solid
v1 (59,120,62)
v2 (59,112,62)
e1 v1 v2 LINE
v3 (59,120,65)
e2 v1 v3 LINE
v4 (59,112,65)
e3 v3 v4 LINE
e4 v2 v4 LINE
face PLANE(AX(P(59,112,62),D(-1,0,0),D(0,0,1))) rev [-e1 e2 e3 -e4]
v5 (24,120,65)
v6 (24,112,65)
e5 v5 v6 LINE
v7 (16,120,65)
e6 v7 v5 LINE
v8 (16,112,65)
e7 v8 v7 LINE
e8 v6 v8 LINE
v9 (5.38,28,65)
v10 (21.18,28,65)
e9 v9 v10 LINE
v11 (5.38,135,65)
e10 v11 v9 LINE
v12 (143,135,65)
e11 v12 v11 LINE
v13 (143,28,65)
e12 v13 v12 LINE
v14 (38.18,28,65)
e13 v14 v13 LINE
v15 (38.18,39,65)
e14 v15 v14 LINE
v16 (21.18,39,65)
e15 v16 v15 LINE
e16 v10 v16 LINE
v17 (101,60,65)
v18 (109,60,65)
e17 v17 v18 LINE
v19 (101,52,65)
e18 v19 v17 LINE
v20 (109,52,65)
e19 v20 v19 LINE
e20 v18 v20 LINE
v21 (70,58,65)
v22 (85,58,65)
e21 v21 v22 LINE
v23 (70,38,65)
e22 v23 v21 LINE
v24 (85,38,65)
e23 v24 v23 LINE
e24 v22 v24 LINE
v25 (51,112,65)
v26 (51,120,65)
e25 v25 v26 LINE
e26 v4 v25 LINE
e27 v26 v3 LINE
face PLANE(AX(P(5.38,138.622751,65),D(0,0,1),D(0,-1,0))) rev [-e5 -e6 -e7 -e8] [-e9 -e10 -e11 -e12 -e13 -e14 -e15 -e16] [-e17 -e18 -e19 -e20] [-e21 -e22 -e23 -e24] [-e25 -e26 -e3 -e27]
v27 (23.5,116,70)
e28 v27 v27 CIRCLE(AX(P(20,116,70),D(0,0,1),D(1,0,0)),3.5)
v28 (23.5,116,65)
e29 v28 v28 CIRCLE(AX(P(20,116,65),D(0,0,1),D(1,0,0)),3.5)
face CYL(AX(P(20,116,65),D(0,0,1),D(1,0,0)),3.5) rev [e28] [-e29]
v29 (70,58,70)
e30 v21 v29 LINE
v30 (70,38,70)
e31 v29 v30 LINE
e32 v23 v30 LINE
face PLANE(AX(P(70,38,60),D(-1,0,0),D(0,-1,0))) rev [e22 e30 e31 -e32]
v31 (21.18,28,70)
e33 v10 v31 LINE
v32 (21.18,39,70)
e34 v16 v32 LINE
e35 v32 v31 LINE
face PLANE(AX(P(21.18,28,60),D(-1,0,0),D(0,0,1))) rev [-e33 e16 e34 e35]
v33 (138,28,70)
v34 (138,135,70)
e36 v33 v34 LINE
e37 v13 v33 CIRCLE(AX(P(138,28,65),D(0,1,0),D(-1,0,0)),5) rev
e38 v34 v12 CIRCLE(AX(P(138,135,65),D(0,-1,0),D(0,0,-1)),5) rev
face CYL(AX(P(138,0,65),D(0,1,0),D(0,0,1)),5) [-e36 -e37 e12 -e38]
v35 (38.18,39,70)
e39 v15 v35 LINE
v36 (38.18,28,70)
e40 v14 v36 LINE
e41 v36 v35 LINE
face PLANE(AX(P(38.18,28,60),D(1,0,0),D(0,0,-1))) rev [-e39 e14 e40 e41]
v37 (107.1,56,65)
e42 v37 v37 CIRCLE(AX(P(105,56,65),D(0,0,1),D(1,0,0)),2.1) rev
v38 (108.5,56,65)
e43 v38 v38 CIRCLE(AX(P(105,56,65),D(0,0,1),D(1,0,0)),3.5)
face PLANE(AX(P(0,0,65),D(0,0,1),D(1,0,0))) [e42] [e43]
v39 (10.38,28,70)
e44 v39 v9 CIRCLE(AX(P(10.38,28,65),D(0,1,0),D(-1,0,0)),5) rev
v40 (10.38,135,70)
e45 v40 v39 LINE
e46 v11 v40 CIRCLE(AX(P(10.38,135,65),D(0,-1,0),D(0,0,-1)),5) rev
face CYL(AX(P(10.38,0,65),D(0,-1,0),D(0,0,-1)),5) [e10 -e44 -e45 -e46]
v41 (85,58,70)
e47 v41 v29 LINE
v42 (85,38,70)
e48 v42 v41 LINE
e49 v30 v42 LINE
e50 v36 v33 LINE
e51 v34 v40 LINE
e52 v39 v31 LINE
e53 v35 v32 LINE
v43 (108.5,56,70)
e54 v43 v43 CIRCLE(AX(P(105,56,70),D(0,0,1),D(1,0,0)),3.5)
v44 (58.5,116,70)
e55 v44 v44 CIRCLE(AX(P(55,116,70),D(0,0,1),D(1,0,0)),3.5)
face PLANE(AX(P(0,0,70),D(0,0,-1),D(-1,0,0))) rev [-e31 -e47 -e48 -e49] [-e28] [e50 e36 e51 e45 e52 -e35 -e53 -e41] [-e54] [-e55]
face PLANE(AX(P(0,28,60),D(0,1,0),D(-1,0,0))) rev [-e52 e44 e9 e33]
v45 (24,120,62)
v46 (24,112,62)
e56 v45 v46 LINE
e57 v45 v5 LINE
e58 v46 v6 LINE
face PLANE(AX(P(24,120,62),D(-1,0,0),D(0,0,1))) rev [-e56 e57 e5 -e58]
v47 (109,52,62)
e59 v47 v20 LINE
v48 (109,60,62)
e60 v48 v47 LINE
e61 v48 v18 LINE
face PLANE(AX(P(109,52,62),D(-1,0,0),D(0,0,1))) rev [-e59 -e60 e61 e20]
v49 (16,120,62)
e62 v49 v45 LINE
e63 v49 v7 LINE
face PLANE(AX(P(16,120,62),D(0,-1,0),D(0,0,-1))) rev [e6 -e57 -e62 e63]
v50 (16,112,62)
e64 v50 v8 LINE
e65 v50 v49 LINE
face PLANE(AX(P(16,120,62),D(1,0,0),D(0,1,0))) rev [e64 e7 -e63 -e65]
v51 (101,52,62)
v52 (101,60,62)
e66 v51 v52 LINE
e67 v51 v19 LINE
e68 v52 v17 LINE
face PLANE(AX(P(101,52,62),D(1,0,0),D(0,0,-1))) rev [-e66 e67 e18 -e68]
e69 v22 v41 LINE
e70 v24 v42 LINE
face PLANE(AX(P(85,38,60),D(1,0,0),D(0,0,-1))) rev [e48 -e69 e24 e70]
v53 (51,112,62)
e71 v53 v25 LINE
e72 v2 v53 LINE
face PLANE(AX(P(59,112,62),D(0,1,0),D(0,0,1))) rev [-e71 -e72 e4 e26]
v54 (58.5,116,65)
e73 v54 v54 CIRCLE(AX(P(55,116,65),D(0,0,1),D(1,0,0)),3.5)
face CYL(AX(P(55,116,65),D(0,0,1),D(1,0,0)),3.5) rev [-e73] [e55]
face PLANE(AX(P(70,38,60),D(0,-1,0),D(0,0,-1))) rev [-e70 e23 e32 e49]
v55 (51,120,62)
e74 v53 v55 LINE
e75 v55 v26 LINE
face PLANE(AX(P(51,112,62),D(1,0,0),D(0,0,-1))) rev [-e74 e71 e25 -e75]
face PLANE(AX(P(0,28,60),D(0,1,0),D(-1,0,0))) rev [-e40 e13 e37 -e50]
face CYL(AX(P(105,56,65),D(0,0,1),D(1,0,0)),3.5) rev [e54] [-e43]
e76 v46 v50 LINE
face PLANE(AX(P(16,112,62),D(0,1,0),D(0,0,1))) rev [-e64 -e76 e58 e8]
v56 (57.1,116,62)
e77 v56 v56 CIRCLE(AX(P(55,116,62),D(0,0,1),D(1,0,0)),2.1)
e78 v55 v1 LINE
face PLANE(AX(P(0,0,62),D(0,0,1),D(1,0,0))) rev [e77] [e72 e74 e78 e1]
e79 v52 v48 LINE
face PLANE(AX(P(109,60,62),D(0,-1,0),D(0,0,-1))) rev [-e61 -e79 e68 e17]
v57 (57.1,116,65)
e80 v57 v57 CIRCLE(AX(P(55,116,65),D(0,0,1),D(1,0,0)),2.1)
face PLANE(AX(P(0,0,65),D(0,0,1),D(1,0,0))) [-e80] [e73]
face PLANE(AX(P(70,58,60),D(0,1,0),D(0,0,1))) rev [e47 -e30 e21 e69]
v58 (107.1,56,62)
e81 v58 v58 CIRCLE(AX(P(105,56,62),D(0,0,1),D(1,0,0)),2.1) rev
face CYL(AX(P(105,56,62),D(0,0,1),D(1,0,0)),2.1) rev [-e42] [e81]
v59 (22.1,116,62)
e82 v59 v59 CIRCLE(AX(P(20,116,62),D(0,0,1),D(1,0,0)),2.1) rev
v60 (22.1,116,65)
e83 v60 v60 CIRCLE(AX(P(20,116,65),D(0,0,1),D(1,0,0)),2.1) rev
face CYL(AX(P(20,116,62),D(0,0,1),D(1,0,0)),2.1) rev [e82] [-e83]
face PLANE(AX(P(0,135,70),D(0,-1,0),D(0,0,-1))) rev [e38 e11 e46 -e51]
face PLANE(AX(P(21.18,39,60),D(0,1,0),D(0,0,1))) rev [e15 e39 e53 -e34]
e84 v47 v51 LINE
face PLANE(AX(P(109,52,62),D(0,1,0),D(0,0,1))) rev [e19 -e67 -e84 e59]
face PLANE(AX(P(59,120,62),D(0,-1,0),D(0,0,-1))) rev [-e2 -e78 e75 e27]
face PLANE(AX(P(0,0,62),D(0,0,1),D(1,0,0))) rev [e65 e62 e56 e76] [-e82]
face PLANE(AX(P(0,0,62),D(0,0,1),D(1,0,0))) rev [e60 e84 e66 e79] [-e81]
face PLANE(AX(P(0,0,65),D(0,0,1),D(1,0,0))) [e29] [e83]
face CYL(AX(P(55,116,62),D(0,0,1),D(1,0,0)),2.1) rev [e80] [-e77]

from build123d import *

# Parameters (mm, degrees)
SKETCH1_W                = 150
SKETCH1_H                = 135
SKETCH1_R                = 2.1
BOSS_EXTRUDE2_DEPTH      = 70
SKETCH13_W               = 166.167800453
SKETCH13_H               = 148.934240363
CUT_EXTRUDE1_DEPTH       = 60
SKETCH17_W               = 17
SKETCH17_H               = 11
SKETCH17_W_2             = 15
SKETCH17_H_2             = 20
CUT_EXTRUDE5_DEPTH       = 10
CUT_EXTRUDE6_DEPTH       = 203.051973512
CUT_EXTRUDE6_DEPTH_BACK  = 203.051973512
SKETCH18_W               = 150
SKETCH18_H               = 135
CUT_EXTRUDE7_DEPTH       = 206.095744471
CUT_EXTRUDE7_DEPTH_BACK  = 206.095744471
FILLET1_R                = 5
SKETCH20_W               = 8
SKETCH20_H               = 8
BOSS_EXTRUDE3_DEPTH      = 3
CUT_EXTRUDE9_START       = -5
SKETCH21_R               = 3.5
SKETCH21_R_2             = 2.1
CUT_EXTRUDE9_DEPTH       = 5
CUT_EXTRUDE10_DEPTH      = 197.81971446
CUT_EXTRUDE10_DEPTH_BACK = 197.81971446
SKETCH21_2_R             = 2.1


with BuildPart() as part:
    # Sketch1 → Boss-Extrude2 (new body)
    with BuildSketch(Plane.XY):
        with Locations((75, 67.5)):
            Rectangle(SKETCH1_W, SKETCH1_H)
        with Locations((20, 116)):
            Circle(SKETCH1_R, mode=Mode.SUBTRACT)
        with Locations((55, 116)):
            Circle(SKETCH1_R, mode=Mode.SUBTRACT)
        with Locations((105, 56)):
            Circle(SKETCH1_R, mode=Mode.SUBTRACT)
    extrude(amount=BOSS_EXTRUDE2_DEPTH)

    # Sketch13 → Cut-Extrude1 (cut)
    with BuildSketch(Plane(origin=(0, 0, 0), x_dir=(-1, 0, 0), z_dir=(0, 0, -1))):
        with Locations((-76.451247165, 67.95351474)):
            Rectangle(SKETCH13_W, SKETCH13_H)
    extrude(amount=-CUT_EXTRUDE1_DEPTH, mode=Mode.SUBTRACT)

    # Sketch17 → Cut-Extrude5 (cut)
    with BuildSketch(Plane.XY.offset(70)):
        with Locations((29.68, 33.5)):
            Rectangle(SKETCH17_W, SKETCH17_H)
        with Locations((77.5, 48)):
            Rectangle(SKETCH17_W_2, SKETCH17_H_2)
    extrude(amount=-CUT_EXTRUDE5_DEPTH, mode=Mode.SUBTRACT)

    # Sketch18 → Cut-Extrude6 (cut, two sides: drawn at the far end of the back side and taken through both)
    # profile 1 of 2: a face of its own
    with BuildSketch(Plane.XY.offset(70).offset(-CUT_EXTRUDE6_DEPTH_BACK)):
        Polygon((-16.428571429, -29.414285714), (-20.085714286, 157.1), (193.857142857, 157.1), (193.857142857, -29.414285714), align=None)
        with Locations((75, 67.5)):
            Rectangle(SKETCH18_W, SKETCH18_H, mode=Mode.SUBTRACT)
    # profile 2 of 2: a face of its own
    with BuildSketch(Plane.XY.offset(70).offset(-CUT_EXTRUDE6_DEPTH_BACK)):
        Polygon((143, 28), (5.38, 28), (5.38, 135), (0, 135), (0, 0), (150, 0), (150, 135), (143, 135), align=None)
    extrude(amount=CUT_EXTRUDE6_DEPTH + CUT_EXTRUDE6_DEPTH_BACK, mode=Mode.SUBTRACT)

    # Sketch19 → Cut-Extrude7 (cut, two sides: drawn at the far end of the back side and taken through both)
    with BuildSketch(Plane(origin=(143, 0, 0), x_dir=(0, 0, -1), z_dir=(1, 0, 0)).offset(-CUT_EXTRUDE7_DEPTH_BACK)):
        Polygon((-65, 138.622751323), (-65, 12.247752415), (-38.78181863, -5.10096745), (-31.852947011, 142.632473856), align=None)
    extrude(amount=CUT_EXTRUDE7_DEPTH + CUT_EXTRUDE7_DEPTH_BACK, mode=Mode.SUBTRACT)

    # Fillet1
    fillet1_edges = [part.edges().sort_by_distance(p)[0] for p in [
        (5.38, 81.5, 70),
        (143, 81.5, 70),
    ]]
    fillet(fillet1_edges, radius=FILLET1_R - 0.0001)  # a hair under: the kernel refuses the full size

    # Sketch20 → Boss-Extrude3 (add)
    with BuildSketch(Plane(origin=(0, 0, 65), x_dir=(-1, 0, 0), z_dir=(0, 0, -1))):
        with Locations((-55, 116)):
            Rectangle(SKETCH20_W, SKETCH20_H)
        with Locations((-20, 116)):
            Rectangle(SKETCH20_W, SKETCH20_H)
        with Locations((-105, 56)):
            Rectangle(SKETCH20_W, SKETCH20_H)
    extrude(amount=BOSS_EXTRUDE3_DEPTH)

    # Sketch21 → Cut-Extrude9 (cut)
    # profile 1 of 3: a face of its own
    with BuildSketch(Plane.XY.offset(70).offset(CUT_EXTRUDE9_START)):
        with Locations((20, 116)):
            Circle(SKETCH21_R)
        with Locations((20, 116)):
            Circle(SKETCH21_R_2, mode=Mode.SUBTRACT)
    # profile 2 of 3: a face of its own
    with BuildSketch(Plane.XY.offset(70).offset(CUT_EXTRUDE9_START)):
        with Locations((55, 116)):
            Circle(SKETCH21_R)
        with Locations((55, 116)):
            Circle(SKETCH21_R_2, mode=Mode.SUBTRACT)
    # profile 3 of 3: a face of its own
    with BuildSketch(Plane.XY.offset(70).offset(CUT_EXTRUDE9_START)):
        with Locations((105, 56)):
            Circle(SKETCH21_R)
        with Locations((105, 56)):
            Circle(SKETCH21_R_2, mode=Mode.SUBTRACT)
    extrude(amount=CUT_EXTRUDE9_DEPTH, mode=Mode.SUBTRACT)

    # Sketch21<2> → Cut-Extrude10 (cut, two sides: drawn at the far end of the back side and taken through both)
    with BuildSketch(Plane.XY.offset(70).offset(-CUT_EXTRUDE10_DEPTH_BACK)):
        with Locations((20, 116)):
            Circle(SKETCH21_2_R)
        with Locations((55, 116)):
            Circle(SKETCH21_2_R)
        with Locations((105, 56)):
            Circle(SKETCH21_2_R)
    extrude(amount=CUT_EXTRUDE10_DEPTH + CUT_EXTRUDE10_DEPTH_BACK, mode=Mode.SUBTRACT)


solid = part.part
